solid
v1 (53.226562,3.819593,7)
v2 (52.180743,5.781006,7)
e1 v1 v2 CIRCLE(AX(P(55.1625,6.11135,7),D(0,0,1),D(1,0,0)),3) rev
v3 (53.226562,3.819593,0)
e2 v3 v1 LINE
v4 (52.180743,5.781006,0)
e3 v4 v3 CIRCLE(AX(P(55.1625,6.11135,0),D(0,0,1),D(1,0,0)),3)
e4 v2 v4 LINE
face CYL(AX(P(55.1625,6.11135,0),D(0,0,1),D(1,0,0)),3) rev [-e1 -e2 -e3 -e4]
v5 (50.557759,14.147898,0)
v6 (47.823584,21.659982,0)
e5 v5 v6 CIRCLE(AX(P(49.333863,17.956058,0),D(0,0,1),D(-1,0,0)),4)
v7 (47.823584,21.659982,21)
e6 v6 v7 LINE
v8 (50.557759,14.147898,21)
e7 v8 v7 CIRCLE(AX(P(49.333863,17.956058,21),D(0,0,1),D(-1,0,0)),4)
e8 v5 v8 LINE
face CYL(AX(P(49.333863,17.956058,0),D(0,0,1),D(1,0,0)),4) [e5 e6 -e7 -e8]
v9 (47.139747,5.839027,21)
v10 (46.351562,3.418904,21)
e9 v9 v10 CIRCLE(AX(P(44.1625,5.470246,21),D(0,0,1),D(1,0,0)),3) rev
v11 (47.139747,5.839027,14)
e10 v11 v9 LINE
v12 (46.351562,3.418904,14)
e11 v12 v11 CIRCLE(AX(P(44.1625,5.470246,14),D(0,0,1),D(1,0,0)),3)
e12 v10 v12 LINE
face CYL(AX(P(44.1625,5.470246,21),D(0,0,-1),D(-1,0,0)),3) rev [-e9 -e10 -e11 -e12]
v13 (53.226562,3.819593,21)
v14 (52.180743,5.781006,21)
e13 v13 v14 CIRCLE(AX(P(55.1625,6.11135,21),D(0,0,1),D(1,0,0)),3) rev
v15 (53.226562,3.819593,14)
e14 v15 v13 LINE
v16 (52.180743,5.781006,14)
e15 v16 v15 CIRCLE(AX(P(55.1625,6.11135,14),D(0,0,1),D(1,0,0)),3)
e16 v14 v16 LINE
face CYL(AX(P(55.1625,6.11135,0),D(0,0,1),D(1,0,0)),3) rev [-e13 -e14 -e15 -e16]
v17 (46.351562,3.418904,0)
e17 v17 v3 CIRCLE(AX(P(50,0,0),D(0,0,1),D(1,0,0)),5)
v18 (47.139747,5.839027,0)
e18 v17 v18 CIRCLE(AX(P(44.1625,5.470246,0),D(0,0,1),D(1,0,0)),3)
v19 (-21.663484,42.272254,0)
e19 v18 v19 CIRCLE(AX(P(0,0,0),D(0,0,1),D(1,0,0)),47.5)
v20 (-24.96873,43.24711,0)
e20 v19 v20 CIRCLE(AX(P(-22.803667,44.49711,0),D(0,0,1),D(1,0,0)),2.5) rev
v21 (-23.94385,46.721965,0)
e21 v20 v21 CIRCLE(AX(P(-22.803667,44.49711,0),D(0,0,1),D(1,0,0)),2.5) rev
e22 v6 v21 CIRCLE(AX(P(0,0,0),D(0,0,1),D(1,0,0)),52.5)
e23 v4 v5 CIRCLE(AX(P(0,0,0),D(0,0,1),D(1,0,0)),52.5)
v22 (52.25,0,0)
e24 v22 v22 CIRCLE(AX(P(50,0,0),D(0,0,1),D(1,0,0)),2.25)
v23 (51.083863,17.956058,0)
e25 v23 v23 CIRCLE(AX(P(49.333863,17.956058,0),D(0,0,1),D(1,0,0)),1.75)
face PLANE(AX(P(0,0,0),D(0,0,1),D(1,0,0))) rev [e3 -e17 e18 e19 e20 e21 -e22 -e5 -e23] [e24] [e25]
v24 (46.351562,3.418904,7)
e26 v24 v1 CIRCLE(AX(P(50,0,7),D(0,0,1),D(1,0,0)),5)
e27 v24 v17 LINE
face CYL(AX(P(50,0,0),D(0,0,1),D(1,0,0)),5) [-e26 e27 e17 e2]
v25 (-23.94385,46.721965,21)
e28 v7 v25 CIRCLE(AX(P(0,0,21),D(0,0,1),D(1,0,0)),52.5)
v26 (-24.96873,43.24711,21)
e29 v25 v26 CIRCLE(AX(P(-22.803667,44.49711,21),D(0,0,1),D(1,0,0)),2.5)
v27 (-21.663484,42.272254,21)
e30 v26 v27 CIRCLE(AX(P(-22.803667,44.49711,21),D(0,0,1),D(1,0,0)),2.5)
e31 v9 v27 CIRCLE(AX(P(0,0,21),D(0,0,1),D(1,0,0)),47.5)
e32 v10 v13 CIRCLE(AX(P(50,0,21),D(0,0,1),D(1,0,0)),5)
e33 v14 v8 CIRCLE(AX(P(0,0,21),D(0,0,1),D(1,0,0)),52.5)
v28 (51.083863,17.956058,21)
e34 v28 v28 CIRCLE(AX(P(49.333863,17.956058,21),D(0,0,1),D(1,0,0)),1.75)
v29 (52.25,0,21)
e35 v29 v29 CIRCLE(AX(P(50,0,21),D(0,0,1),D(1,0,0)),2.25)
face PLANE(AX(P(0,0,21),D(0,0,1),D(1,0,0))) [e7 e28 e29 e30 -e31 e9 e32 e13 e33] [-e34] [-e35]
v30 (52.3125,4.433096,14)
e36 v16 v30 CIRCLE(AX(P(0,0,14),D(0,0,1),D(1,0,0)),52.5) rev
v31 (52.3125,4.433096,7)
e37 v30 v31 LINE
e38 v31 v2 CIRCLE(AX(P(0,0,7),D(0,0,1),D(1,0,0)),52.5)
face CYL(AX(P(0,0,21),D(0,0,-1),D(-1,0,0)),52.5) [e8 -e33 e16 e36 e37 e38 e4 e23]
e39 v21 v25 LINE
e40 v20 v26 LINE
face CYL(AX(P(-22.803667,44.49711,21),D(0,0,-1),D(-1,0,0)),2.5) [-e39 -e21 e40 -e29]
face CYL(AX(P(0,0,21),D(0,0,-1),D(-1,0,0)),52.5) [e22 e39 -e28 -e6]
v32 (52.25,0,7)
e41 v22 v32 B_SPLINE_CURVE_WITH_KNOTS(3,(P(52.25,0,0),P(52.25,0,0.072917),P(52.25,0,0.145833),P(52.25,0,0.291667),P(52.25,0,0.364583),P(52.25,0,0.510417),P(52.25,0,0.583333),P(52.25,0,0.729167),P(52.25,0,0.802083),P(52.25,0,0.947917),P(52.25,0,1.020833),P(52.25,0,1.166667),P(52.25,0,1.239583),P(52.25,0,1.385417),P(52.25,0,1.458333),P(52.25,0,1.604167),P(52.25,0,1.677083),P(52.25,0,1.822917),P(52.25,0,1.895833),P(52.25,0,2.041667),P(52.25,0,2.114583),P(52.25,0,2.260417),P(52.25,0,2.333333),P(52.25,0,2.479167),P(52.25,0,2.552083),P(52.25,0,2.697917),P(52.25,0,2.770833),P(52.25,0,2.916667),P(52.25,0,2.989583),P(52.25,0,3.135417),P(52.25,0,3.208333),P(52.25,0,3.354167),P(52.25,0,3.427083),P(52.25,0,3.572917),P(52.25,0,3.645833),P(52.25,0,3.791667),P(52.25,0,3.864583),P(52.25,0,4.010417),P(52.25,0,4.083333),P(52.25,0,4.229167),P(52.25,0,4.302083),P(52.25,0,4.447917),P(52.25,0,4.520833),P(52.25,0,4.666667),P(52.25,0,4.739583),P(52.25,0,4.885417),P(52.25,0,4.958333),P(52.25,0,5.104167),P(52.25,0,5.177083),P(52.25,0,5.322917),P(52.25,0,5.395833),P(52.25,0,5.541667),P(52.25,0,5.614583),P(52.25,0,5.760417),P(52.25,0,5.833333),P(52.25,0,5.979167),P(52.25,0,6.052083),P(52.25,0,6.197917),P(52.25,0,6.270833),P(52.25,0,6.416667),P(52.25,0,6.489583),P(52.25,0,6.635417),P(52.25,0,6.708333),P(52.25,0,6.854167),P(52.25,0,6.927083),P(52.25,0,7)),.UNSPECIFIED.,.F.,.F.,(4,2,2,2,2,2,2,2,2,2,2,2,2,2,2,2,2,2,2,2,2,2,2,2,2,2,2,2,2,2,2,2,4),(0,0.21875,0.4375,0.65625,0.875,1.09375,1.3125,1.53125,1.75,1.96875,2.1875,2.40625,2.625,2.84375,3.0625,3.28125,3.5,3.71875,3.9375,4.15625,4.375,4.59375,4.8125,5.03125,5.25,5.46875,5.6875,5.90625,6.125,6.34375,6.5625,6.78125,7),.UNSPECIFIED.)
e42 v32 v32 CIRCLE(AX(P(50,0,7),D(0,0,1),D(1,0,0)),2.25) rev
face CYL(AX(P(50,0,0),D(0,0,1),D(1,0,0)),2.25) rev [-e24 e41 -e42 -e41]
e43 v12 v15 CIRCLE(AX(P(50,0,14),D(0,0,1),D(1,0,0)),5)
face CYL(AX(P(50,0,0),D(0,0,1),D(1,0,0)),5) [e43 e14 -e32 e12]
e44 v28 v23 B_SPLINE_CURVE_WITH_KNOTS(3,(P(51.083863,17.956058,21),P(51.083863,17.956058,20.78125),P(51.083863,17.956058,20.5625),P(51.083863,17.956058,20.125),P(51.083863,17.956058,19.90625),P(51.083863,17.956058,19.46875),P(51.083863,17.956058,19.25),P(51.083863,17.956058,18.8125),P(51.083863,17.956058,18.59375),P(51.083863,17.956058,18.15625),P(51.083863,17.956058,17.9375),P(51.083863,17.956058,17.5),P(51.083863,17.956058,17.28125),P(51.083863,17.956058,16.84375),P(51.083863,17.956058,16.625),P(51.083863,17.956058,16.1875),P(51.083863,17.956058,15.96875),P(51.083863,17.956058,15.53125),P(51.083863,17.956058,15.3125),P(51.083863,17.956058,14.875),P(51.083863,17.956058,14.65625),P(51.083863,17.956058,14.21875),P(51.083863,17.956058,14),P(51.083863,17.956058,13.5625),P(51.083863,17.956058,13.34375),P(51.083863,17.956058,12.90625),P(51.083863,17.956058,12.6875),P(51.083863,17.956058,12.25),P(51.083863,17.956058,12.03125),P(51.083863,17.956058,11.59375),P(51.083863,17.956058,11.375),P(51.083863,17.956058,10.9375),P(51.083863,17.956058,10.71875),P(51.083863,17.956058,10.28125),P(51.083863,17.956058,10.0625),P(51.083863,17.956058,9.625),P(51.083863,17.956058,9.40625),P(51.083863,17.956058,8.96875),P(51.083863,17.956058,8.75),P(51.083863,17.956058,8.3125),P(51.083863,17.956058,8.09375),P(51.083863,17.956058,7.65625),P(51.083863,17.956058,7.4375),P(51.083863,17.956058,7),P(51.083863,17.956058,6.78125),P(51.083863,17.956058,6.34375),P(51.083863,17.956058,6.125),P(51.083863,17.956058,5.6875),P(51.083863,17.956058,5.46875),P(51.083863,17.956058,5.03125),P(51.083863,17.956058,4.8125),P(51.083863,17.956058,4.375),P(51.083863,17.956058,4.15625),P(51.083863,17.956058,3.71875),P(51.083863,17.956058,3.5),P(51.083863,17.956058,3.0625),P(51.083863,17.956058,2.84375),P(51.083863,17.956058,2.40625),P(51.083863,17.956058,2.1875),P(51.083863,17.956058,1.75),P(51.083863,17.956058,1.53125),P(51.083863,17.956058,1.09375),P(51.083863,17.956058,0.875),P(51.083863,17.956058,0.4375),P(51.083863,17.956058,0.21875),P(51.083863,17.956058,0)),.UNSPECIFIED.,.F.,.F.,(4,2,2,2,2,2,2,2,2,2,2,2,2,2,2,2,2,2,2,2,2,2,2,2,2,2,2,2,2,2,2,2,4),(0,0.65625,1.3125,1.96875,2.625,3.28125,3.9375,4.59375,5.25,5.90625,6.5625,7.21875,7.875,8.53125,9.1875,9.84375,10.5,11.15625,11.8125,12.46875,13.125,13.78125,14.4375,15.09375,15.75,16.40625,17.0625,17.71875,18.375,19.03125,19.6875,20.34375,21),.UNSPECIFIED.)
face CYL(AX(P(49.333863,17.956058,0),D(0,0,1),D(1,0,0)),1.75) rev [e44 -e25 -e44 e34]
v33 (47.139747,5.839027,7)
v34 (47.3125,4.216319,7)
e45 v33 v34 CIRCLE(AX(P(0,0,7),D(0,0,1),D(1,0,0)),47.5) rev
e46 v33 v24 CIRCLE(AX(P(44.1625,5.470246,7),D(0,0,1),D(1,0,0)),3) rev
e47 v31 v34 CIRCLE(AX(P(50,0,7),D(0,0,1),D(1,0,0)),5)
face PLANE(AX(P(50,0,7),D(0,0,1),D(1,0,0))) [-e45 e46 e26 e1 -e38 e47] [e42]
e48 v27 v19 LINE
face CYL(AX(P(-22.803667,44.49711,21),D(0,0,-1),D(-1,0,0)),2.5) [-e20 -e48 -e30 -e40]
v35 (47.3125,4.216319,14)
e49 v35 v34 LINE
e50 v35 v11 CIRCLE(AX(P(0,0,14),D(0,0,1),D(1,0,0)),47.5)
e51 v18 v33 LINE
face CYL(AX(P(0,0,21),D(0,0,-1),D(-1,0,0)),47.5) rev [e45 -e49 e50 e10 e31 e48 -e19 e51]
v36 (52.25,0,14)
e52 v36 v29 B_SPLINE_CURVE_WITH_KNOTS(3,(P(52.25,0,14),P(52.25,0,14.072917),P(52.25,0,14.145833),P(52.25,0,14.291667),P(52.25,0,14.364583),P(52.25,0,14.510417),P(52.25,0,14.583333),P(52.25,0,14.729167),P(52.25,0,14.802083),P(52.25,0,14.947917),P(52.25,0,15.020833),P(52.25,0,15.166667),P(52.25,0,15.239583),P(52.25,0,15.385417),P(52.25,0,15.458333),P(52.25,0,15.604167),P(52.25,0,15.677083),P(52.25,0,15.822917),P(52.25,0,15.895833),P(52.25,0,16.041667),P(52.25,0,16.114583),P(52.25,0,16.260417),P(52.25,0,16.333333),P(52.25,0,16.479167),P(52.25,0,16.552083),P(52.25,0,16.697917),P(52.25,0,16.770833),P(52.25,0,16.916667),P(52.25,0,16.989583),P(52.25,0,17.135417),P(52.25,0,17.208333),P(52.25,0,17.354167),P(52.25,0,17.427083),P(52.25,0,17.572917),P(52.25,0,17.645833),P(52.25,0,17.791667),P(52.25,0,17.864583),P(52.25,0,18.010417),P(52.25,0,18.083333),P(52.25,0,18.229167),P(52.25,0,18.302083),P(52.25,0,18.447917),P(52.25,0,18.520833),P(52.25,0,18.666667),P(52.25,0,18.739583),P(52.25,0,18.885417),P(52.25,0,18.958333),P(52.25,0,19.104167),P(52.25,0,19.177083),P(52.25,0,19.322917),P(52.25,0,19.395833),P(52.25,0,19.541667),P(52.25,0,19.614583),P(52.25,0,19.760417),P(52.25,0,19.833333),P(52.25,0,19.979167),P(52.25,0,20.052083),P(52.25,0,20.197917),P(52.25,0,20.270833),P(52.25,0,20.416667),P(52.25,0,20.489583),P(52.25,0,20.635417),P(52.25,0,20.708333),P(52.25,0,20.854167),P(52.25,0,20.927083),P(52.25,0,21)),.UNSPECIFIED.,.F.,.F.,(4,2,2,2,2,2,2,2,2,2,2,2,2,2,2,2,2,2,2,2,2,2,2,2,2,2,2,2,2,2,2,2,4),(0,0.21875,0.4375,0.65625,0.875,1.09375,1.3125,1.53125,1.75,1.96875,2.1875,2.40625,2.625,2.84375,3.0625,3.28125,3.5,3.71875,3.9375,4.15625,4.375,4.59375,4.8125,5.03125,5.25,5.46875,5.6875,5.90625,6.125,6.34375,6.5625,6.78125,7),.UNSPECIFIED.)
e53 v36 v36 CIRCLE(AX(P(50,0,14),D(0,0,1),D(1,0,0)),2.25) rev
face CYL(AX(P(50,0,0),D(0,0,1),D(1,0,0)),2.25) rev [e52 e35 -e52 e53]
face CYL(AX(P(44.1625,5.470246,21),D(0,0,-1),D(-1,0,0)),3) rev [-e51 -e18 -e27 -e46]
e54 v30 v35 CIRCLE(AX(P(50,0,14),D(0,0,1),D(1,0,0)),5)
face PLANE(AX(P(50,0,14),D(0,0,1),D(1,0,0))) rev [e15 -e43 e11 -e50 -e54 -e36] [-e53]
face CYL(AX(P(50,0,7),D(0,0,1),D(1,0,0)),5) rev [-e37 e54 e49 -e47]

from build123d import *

# Parameters (mm, degrees)
EXTRU_MINCE1_DEPTH           = 21
ESQUISSE4_R                  = 4.9999999999999964
BOSS_EXTRU_2_DEPTH           = 21
ENL_V_MAT_EXTRU_2_DEPTH      = 79.88123984826811
ENL_V_MAT_EXTRU_2_DEPTH_BACK = 79.88123984826811
ESQUISSE5_R                  = 2.250000000000002
ENL_V_START                  = -7
ESQUISSE6_R                  = 4.9999999999999964
ENL_V_MAT_EXTRU_3_DEPTH      = 7
CONG_4_R                     = 3
CONG_6_R                     = 2.5
BOSS_EXTRU_3_START           = -21
BOSS_EXTRU_3_DEPTH           = 21
ENL_V_MAT_EXTRU_4_DEPTH      = 79.88123984826811
ENL_V_MAT_EXTRU_4_DEPTH_BACK = 79.88123984826811
ESQUISSE8_R                  = 1.7500000000000038


# Some blends are built 0.0001 mm under size
with BuildPart() as part:
    # Esquisse1 → Extru.-Mince1 (new body)
    with BuildSketch(Plane.XY):
        with BuildLine():
            ThreePointArc((52.49999999999999, 4.2e-16), (26.249999999999886, 45.46633369868308), (-26.250000000000224, 45.4663336986829))
            Line((-26.250000000000224, 45.4663336986829), (-23.750000000000203, 41.13620667976072))
            ThreePointArc((-23.750000000000203, 41.13620667976072), (23.749999999999897, 41.13620667976088), (47.49999999999999, -4.2e-16))
            Line((47.49999999999999, -4.2e-16), (52.49999999999999, 4.2e-16))
        make_face()
    extrude(amount=EXTRU_MINCE1_DEPTH)

    # Esquisse4 → Boss.-Extru.2 (add)
    with BuildSketch(Plane.XY.offset(21)):
        with Locations((50, 0)):
            Circle(ESQUISSE4_R)
    extrude(amount=-BOSS_EXTRU_2_DEPTH)

    # Esquisse5 → Enlèv. mat.-Extru.2 (cut, two sides: drawn at the far end of the back side and taken through both)
    with BuildSketch(Plane.XY.offset(21).offset(-ENL_V_MAT_EXTRU_2_DEPTH_BACK)):
        with Locations((50, 0)):
            Circle(ESQUISSE5_R)
    extrude(amount=ENL_V_MAT_EXTRU_2_DEPTH + ENL_V_MAT_EXTRU_2_DEPTH_BACK, mode=Mode.SUBTRACT)

    # Esquisse6 → Enlèv. mat.-Extru.3 (cut)
    with BuildSketch(Plane.XY.offset(21).offset(ENL_V_START)):
        with Locations((50, 0)):
            Circle(ESQUISSE6_R)
    extrude(amount=-ENL_V_MAT_EXTRU_3_DEPTH, mode=Mode.SUBTRACT)

    # Congé4
    # the kernel refuses this fillet: 3 mm, written as the material it adds along each edge
    with BuildSketch(Plane(origin=(47.3125, 4.216318743880709, 21), x_dir=(-0.7695454862891271, -0.6385920016192113, 0), z_dir=(0, 0, -1)), Plane(origin=(47.3125, 4.216318743880709, 7), x_dir=(-0.7695454862891271, -0.6385920016192113, 0), z_dir=(0, 0, -1))) as cong_4_piece_1:
        with BuildLine():
            CenterArc((1.6233202224653038, 2.976519037476766), CONG_4_R, 212.62585704290902, 50.20084903739968)
            ThreePointArc((-0.903307284750997, 1.359066274711204), (-0.45749046797105886, 0.6756536745373425), (0, 0))
            ThreePointArc((0, 0), (0.6243539317174114, 0.03913493753872468), (1.2487078634348219, 4e-17))
        make_face()
    extrude(amount=7)
    with BuildSketch(Plane(origin=(52.3125, 4.433096406576334, 21), x_dir=(0.8303156074241137, -0.5572934523820687, 0), z_dir=(0, 0, -1)), Plane(origin=(52.3125, 4.433096406576334, 7), x_dir=(0.8303156074241137, -0.5572934523820687, 0), z_dir=(0, 0, -1))) as cong_4_piece_2:
        with BuildLine():
            CenterArc((1.4311199733874571, -2.981766146537774), CONG_4_R, 96.3202818650538, 43.48897964287826)
            ThreePointArc((-0.8605810852935136, -1.0457634973555643), (-0.4269182279533879, -0.5256568983613493), (0, 0))
            ThreePointArc((0, 0), (0.5504307589951836, -0.03038975577037968), (1.100861517990363, 3e-17))
        make_face()
    extrude(amount=7)

    # Congé6
    cong_6_edges = [part.edges().sort_by_distance(p)[0] for p in [
        (-26.25000000000022, 45.46633369868291, 10.5),
        (-23.750000000000203, 41.13620667976072, 10.5),
    ]]
    fillet(cong_6_edges, radius=CONG_6_R - 0.0001)  # a hair under: the kernel refuses the full size

    # Esquisse7 → Boss.-Extru.3 (add)
    with BuildSketch(Plane.XY.offset(21).offset(BOSS_EXTRU_3_START)):
        with BuildLine():
            ThreePointArc((47.82358383341308, 21.659982209792123), (53.09263307440395, 19.324138097899965), (50.5577588361061, 14.147898129055626))
            ThreePointArc((50.5577588361061, 14.147898129055626), (49.33386259126014, 17.956057524597252), (47.82358383341308, 21.659982209792123))
        make_face()
    extrude(amount=BOSS_EXTRU_3_DEPTH)

    # Esquisse8 → Enlèv. mat.-Extru.4 (cut, two sides: drawn at the far end of the back side and taken through both)
    with BuildSketch(Plane.XY.offset(21).offset(-ENL_V_MAT_EXTRU_4_DEPTH_BACK)):
        with Locations((49.333862591260306, 17.956057524597313)):
            Circle(ESQUISSE8_R)
    extrude(amount=ENL_V_MAT_EXTRU_4_DEPTH + ENL_V_MAT_EXTRU_4_DEPTH_BACK, mode=Mode.SUBTRACT)


solid = part.part
